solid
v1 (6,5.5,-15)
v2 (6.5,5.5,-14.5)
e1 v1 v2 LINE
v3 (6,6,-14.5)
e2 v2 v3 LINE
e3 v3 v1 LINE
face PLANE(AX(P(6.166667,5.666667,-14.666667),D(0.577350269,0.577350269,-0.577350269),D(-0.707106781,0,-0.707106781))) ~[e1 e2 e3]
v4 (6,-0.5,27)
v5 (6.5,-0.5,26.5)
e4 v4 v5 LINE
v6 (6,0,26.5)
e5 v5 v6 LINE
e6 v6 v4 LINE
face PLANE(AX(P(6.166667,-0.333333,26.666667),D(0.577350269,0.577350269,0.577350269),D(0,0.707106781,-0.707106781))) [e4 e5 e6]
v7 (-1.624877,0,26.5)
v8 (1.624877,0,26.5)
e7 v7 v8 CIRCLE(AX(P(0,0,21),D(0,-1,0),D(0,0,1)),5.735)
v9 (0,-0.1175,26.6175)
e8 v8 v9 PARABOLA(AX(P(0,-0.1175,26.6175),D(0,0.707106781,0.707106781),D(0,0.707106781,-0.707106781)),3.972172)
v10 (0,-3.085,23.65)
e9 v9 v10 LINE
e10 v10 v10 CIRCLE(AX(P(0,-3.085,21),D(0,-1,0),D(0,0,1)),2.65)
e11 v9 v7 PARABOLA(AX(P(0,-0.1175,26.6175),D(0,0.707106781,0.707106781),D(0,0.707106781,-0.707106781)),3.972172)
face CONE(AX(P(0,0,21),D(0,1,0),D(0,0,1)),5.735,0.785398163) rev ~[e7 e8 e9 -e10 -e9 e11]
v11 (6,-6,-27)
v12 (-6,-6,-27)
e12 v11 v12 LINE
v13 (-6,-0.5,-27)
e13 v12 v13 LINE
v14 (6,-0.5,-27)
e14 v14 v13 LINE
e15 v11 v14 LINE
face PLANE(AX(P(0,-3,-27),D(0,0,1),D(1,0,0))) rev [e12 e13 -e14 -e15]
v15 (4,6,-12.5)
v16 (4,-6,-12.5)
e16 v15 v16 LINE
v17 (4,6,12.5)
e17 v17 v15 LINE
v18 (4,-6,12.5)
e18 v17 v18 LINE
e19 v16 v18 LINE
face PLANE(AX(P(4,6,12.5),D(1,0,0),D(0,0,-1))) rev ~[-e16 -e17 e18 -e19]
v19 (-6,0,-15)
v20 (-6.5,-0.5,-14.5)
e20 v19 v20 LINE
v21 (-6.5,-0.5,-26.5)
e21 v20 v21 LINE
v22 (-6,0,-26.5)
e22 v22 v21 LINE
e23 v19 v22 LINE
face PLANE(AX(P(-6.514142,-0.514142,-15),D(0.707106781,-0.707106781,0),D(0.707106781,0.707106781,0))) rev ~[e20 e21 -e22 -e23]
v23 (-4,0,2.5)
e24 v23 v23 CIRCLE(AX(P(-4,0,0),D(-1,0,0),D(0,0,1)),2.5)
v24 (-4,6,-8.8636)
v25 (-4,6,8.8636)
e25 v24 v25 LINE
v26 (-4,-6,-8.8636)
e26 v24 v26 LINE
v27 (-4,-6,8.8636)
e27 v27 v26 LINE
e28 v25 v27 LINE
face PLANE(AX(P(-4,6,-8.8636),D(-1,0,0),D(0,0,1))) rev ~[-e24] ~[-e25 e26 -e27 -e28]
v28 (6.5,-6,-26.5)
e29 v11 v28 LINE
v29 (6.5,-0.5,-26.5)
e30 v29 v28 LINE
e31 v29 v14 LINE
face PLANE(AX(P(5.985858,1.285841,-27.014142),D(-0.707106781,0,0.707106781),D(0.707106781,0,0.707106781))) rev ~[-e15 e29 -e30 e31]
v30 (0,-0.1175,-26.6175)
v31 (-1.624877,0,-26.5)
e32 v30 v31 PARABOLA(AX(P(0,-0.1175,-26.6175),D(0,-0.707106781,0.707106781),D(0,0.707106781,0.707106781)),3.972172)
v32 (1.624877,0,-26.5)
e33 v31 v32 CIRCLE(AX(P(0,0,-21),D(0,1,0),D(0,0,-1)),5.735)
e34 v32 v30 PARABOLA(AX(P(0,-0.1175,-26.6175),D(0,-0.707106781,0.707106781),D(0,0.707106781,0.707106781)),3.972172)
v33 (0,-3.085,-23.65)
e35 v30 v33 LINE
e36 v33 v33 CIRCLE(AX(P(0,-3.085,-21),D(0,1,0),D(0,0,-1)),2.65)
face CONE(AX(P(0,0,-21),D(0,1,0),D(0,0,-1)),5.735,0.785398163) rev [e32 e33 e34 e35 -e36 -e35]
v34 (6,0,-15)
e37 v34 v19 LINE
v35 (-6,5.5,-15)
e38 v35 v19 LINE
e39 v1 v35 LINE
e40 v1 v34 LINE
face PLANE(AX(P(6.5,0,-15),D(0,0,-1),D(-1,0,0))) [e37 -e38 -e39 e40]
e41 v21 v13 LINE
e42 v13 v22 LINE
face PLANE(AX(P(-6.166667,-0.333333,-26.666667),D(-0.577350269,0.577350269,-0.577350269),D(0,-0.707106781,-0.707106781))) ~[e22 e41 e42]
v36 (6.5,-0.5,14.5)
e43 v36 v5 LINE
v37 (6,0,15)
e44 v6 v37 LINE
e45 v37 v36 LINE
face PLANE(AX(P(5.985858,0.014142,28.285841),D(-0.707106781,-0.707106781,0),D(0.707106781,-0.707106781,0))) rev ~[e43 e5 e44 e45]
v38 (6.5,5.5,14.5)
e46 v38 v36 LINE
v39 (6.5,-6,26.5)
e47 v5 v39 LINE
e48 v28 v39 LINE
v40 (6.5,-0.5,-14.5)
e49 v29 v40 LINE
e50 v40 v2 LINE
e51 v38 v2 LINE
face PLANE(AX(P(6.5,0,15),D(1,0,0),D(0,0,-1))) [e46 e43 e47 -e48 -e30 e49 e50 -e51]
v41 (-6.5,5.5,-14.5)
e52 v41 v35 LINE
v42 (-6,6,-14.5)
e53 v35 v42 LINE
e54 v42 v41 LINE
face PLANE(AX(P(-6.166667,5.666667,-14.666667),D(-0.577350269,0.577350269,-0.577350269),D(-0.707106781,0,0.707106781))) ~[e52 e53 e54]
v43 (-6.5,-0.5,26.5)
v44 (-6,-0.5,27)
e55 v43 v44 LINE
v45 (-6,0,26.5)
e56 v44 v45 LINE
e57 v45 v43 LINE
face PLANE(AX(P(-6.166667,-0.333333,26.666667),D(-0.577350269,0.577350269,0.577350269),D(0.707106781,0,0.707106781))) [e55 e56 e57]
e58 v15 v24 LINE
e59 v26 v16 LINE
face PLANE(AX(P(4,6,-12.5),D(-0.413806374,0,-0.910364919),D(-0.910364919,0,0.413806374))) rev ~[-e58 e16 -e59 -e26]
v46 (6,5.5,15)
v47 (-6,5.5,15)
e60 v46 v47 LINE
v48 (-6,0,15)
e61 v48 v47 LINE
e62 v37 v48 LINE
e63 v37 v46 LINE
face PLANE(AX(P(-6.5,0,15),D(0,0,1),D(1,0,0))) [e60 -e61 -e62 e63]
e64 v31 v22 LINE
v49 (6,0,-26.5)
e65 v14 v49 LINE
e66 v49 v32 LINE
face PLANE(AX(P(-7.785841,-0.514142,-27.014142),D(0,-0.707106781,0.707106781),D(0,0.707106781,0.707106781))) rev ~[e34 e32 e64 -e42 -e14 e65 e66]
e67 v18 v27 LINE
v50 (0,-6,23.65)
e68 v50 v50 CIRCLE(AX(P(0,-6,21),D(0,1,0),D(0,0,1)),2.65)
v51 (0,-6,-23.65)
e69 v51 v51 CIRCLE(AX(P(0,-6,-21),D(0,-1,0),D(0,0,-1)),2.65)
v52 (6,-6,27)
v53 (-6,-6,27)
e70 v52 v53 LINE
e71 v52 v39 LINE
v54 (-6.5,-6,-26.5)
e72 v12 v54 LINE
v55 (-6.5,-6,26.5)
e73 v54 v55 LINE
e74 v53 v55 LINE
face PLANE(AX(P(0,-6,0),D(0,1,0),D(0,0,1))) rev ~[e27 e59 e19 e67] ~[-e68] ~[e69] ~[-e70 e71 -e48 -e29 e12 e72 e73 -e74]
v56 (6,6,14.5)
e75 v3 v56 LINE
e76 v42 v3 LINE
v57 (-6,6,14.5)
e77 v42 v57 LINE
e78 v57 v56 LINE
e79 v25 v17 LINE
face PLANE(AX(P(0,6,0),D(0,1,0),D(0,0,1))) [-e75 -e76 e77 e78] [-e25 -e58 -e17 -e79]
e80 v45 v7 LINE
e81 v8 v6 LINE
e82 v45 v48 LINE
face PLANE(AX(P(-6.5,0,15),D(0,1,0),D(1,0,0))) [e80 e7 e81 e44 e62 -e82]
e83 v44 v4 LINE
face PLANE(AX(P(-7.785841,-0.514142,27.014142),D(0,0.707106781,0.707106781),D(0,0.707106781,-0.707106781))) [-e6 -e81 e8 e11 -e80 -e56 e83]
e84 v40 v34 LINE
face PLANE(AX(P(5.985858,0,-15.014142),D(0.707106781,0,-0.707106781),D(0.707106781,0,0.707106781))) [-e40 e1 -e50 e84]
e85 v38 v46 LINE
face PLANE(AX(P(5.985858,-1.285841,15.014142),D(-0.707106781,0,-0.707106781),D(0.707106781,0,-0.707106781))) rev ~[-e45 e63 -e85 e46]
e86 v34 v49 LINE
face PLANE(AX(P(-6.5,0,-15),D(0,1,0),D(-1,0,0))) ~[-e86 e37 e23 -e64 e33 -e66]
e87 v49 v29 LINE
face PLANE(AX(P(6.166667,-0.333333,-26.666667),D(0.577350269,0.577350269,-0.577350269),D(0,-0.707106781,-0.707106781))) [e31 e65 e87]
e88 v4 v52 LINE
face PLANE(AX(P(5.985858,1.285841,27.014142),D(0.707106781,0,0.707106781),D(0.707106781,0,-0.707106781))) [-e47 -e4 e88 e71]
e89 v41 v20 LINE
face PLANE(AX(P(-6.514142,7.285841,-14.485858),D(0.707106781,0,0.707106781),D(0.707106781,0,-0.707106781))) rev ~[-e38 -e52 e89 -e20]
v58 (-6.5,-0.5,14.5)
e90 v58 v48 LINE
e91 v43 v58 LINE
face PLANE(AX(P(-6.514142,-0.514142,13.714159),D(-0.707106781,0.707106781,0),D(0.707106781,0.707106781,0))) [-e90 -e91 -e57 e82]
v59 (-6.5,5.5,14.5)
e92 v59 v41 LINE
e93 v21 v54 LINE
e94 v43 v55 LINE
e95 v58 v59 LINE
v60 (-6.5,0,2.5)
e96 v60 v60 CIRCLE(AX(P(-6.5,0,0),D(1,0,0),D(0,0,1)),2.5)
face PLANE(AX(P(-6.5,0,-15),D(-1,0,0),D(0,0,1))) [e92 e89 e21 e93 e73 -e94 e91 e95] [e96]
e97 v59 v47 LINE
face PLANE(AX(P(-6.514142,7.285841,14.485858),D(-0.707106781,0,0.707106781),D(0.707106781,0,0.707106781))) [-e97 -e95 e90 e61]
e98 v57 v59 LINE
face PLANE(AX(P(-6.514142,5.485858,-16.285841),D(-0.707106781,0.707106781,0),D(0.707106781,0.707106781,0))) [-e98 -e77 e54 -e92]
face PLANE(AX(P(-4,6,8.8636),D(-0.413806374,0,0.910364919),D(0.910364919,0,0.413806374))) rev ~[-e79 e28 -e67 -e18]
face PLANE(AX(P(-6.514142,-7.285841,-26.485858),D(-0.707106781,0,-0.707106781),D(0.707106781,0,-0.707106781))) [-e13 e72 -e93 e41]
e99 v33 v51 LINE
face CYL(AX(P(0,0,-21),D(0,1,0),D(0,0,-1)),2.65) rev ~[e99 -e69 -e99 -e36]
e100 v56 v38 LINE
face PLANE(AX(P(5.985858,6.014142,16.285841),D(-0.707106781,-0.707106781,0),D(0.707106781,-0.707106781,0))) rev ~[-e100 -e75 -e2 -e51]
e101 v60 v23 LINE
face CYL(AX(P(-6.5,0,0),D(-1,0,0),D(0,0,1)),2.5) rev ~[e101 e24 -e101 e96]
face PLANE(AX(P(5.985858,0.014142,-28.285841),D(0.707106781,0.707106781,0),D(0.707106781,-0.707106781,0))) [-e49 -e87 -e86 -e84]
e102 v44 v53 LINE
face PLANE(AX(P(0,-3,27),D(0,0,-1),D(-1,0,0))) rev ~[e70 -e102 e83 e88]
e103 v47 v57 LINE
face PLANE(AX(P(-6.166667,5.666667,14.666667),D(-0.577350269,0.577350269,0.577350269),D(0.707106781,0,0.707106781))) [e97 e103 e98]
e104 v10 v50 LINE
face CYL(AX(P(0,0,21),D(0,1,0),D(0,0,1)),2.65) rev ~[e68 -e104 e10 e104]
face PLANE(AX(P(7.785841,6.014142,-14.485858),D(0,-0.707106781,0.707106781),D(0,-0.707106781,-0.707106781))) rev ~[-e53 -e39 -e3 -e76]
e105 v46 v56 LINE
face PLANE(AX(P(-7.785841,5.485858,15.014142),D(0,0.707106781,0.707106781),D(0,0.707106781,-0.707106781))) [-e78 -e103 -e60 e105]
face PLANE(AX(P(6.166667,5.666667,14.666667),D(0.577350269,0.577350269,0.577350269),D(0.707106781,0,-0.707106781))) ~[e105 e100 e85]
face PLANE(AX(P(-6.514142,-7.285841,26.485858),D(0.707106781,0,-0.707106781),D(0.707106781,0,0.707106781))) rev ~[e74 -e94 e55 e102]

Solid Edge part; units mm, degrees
sketch "Sketch1" plane through (0, 0, 0) normal (0, -1, 0) x (1, 0, 0)
  line L0 (-6.5, 15) -> (6.5, 15)
  line L1 (6.5, 15) -> (6.5, -15)
  line L2 (6.5, -15) -> (-6.5, -15)
  line L3 (-6.5, -15) -> (-6.5, 15)
  dimension "D1" = 13
  dimension "D2" = 30
extrude "Ajout_matière_1" add sketch "Sketch1" along normal mid plane 12
sketch "Sketch2" plane through (0, 6, 0) normal (0, 1, 0) x (-1, 0, 0)
  line L0 (-4, 12.5) -> (-4, -12.5)
  line L1 (-4, -12.5) -> (4, -8.8636)
  line L2 (4, -8.8636) -> (4, 8.8636)
  line L3 (4, 8.8636) -> (-4, 12.5)
  dimension "D1" = 8
  dimension "D2" = 25
extrude "Cutout1" cut sketch "Sketch2" against normal up to next
sketch "Sketch3" plane through (0, 0, 15) normal (0, 0, 1) x (1, 0, 0)
  line L0 (-6.5, 0) -> (6.5, 0)
  line L1 (6.5, 0) -> (6.5, -6)
  line L2 (6.5, -6) -> (-6.5, -6)
  line L3 (-6.5, -6) -> (-6.5, 0)
extrude "Protrusion1" add sketch "Sketch3" along normal blind 12 and the other way blind 1
hole "Perçage_2" at (0, 0, 21) direction (0, -1, 0) diameter 5.3 end up to next countersink diameter 11.47 countersink angle 90
mirror "Mirror1" about plane through (0, 0, 0) normal (0, 0, 1) of "Protrusion1", "Perçage_2"
hole "Perçage_4" at (-6.5, 0, 0) direction (1, 0, 0) diameter 5 end up to next
chamfer "Chanfrein_1" distance 0.5 angle 45 18 edges at (0, 6, 15) (6.5, 6, 0) (-6.5, 6, 0) (0, 6, -15) (-6.5, 3, 15) (-6.5, 3, -15) (-6.5, 0, -21) (6.5, 3, 15) (6.5, 3, -15) (6.5, 0, -21) (0, 0, -27) (6.5, 0, 21) (0, 0, 27) (-6.5, 0, 21) (6.5, -3, 27) (-6.5, -3, 27) (6.5, -3, -27) (-6.5, -3, -27)
properties material "Aluminium AU4G, 2024_T4"
